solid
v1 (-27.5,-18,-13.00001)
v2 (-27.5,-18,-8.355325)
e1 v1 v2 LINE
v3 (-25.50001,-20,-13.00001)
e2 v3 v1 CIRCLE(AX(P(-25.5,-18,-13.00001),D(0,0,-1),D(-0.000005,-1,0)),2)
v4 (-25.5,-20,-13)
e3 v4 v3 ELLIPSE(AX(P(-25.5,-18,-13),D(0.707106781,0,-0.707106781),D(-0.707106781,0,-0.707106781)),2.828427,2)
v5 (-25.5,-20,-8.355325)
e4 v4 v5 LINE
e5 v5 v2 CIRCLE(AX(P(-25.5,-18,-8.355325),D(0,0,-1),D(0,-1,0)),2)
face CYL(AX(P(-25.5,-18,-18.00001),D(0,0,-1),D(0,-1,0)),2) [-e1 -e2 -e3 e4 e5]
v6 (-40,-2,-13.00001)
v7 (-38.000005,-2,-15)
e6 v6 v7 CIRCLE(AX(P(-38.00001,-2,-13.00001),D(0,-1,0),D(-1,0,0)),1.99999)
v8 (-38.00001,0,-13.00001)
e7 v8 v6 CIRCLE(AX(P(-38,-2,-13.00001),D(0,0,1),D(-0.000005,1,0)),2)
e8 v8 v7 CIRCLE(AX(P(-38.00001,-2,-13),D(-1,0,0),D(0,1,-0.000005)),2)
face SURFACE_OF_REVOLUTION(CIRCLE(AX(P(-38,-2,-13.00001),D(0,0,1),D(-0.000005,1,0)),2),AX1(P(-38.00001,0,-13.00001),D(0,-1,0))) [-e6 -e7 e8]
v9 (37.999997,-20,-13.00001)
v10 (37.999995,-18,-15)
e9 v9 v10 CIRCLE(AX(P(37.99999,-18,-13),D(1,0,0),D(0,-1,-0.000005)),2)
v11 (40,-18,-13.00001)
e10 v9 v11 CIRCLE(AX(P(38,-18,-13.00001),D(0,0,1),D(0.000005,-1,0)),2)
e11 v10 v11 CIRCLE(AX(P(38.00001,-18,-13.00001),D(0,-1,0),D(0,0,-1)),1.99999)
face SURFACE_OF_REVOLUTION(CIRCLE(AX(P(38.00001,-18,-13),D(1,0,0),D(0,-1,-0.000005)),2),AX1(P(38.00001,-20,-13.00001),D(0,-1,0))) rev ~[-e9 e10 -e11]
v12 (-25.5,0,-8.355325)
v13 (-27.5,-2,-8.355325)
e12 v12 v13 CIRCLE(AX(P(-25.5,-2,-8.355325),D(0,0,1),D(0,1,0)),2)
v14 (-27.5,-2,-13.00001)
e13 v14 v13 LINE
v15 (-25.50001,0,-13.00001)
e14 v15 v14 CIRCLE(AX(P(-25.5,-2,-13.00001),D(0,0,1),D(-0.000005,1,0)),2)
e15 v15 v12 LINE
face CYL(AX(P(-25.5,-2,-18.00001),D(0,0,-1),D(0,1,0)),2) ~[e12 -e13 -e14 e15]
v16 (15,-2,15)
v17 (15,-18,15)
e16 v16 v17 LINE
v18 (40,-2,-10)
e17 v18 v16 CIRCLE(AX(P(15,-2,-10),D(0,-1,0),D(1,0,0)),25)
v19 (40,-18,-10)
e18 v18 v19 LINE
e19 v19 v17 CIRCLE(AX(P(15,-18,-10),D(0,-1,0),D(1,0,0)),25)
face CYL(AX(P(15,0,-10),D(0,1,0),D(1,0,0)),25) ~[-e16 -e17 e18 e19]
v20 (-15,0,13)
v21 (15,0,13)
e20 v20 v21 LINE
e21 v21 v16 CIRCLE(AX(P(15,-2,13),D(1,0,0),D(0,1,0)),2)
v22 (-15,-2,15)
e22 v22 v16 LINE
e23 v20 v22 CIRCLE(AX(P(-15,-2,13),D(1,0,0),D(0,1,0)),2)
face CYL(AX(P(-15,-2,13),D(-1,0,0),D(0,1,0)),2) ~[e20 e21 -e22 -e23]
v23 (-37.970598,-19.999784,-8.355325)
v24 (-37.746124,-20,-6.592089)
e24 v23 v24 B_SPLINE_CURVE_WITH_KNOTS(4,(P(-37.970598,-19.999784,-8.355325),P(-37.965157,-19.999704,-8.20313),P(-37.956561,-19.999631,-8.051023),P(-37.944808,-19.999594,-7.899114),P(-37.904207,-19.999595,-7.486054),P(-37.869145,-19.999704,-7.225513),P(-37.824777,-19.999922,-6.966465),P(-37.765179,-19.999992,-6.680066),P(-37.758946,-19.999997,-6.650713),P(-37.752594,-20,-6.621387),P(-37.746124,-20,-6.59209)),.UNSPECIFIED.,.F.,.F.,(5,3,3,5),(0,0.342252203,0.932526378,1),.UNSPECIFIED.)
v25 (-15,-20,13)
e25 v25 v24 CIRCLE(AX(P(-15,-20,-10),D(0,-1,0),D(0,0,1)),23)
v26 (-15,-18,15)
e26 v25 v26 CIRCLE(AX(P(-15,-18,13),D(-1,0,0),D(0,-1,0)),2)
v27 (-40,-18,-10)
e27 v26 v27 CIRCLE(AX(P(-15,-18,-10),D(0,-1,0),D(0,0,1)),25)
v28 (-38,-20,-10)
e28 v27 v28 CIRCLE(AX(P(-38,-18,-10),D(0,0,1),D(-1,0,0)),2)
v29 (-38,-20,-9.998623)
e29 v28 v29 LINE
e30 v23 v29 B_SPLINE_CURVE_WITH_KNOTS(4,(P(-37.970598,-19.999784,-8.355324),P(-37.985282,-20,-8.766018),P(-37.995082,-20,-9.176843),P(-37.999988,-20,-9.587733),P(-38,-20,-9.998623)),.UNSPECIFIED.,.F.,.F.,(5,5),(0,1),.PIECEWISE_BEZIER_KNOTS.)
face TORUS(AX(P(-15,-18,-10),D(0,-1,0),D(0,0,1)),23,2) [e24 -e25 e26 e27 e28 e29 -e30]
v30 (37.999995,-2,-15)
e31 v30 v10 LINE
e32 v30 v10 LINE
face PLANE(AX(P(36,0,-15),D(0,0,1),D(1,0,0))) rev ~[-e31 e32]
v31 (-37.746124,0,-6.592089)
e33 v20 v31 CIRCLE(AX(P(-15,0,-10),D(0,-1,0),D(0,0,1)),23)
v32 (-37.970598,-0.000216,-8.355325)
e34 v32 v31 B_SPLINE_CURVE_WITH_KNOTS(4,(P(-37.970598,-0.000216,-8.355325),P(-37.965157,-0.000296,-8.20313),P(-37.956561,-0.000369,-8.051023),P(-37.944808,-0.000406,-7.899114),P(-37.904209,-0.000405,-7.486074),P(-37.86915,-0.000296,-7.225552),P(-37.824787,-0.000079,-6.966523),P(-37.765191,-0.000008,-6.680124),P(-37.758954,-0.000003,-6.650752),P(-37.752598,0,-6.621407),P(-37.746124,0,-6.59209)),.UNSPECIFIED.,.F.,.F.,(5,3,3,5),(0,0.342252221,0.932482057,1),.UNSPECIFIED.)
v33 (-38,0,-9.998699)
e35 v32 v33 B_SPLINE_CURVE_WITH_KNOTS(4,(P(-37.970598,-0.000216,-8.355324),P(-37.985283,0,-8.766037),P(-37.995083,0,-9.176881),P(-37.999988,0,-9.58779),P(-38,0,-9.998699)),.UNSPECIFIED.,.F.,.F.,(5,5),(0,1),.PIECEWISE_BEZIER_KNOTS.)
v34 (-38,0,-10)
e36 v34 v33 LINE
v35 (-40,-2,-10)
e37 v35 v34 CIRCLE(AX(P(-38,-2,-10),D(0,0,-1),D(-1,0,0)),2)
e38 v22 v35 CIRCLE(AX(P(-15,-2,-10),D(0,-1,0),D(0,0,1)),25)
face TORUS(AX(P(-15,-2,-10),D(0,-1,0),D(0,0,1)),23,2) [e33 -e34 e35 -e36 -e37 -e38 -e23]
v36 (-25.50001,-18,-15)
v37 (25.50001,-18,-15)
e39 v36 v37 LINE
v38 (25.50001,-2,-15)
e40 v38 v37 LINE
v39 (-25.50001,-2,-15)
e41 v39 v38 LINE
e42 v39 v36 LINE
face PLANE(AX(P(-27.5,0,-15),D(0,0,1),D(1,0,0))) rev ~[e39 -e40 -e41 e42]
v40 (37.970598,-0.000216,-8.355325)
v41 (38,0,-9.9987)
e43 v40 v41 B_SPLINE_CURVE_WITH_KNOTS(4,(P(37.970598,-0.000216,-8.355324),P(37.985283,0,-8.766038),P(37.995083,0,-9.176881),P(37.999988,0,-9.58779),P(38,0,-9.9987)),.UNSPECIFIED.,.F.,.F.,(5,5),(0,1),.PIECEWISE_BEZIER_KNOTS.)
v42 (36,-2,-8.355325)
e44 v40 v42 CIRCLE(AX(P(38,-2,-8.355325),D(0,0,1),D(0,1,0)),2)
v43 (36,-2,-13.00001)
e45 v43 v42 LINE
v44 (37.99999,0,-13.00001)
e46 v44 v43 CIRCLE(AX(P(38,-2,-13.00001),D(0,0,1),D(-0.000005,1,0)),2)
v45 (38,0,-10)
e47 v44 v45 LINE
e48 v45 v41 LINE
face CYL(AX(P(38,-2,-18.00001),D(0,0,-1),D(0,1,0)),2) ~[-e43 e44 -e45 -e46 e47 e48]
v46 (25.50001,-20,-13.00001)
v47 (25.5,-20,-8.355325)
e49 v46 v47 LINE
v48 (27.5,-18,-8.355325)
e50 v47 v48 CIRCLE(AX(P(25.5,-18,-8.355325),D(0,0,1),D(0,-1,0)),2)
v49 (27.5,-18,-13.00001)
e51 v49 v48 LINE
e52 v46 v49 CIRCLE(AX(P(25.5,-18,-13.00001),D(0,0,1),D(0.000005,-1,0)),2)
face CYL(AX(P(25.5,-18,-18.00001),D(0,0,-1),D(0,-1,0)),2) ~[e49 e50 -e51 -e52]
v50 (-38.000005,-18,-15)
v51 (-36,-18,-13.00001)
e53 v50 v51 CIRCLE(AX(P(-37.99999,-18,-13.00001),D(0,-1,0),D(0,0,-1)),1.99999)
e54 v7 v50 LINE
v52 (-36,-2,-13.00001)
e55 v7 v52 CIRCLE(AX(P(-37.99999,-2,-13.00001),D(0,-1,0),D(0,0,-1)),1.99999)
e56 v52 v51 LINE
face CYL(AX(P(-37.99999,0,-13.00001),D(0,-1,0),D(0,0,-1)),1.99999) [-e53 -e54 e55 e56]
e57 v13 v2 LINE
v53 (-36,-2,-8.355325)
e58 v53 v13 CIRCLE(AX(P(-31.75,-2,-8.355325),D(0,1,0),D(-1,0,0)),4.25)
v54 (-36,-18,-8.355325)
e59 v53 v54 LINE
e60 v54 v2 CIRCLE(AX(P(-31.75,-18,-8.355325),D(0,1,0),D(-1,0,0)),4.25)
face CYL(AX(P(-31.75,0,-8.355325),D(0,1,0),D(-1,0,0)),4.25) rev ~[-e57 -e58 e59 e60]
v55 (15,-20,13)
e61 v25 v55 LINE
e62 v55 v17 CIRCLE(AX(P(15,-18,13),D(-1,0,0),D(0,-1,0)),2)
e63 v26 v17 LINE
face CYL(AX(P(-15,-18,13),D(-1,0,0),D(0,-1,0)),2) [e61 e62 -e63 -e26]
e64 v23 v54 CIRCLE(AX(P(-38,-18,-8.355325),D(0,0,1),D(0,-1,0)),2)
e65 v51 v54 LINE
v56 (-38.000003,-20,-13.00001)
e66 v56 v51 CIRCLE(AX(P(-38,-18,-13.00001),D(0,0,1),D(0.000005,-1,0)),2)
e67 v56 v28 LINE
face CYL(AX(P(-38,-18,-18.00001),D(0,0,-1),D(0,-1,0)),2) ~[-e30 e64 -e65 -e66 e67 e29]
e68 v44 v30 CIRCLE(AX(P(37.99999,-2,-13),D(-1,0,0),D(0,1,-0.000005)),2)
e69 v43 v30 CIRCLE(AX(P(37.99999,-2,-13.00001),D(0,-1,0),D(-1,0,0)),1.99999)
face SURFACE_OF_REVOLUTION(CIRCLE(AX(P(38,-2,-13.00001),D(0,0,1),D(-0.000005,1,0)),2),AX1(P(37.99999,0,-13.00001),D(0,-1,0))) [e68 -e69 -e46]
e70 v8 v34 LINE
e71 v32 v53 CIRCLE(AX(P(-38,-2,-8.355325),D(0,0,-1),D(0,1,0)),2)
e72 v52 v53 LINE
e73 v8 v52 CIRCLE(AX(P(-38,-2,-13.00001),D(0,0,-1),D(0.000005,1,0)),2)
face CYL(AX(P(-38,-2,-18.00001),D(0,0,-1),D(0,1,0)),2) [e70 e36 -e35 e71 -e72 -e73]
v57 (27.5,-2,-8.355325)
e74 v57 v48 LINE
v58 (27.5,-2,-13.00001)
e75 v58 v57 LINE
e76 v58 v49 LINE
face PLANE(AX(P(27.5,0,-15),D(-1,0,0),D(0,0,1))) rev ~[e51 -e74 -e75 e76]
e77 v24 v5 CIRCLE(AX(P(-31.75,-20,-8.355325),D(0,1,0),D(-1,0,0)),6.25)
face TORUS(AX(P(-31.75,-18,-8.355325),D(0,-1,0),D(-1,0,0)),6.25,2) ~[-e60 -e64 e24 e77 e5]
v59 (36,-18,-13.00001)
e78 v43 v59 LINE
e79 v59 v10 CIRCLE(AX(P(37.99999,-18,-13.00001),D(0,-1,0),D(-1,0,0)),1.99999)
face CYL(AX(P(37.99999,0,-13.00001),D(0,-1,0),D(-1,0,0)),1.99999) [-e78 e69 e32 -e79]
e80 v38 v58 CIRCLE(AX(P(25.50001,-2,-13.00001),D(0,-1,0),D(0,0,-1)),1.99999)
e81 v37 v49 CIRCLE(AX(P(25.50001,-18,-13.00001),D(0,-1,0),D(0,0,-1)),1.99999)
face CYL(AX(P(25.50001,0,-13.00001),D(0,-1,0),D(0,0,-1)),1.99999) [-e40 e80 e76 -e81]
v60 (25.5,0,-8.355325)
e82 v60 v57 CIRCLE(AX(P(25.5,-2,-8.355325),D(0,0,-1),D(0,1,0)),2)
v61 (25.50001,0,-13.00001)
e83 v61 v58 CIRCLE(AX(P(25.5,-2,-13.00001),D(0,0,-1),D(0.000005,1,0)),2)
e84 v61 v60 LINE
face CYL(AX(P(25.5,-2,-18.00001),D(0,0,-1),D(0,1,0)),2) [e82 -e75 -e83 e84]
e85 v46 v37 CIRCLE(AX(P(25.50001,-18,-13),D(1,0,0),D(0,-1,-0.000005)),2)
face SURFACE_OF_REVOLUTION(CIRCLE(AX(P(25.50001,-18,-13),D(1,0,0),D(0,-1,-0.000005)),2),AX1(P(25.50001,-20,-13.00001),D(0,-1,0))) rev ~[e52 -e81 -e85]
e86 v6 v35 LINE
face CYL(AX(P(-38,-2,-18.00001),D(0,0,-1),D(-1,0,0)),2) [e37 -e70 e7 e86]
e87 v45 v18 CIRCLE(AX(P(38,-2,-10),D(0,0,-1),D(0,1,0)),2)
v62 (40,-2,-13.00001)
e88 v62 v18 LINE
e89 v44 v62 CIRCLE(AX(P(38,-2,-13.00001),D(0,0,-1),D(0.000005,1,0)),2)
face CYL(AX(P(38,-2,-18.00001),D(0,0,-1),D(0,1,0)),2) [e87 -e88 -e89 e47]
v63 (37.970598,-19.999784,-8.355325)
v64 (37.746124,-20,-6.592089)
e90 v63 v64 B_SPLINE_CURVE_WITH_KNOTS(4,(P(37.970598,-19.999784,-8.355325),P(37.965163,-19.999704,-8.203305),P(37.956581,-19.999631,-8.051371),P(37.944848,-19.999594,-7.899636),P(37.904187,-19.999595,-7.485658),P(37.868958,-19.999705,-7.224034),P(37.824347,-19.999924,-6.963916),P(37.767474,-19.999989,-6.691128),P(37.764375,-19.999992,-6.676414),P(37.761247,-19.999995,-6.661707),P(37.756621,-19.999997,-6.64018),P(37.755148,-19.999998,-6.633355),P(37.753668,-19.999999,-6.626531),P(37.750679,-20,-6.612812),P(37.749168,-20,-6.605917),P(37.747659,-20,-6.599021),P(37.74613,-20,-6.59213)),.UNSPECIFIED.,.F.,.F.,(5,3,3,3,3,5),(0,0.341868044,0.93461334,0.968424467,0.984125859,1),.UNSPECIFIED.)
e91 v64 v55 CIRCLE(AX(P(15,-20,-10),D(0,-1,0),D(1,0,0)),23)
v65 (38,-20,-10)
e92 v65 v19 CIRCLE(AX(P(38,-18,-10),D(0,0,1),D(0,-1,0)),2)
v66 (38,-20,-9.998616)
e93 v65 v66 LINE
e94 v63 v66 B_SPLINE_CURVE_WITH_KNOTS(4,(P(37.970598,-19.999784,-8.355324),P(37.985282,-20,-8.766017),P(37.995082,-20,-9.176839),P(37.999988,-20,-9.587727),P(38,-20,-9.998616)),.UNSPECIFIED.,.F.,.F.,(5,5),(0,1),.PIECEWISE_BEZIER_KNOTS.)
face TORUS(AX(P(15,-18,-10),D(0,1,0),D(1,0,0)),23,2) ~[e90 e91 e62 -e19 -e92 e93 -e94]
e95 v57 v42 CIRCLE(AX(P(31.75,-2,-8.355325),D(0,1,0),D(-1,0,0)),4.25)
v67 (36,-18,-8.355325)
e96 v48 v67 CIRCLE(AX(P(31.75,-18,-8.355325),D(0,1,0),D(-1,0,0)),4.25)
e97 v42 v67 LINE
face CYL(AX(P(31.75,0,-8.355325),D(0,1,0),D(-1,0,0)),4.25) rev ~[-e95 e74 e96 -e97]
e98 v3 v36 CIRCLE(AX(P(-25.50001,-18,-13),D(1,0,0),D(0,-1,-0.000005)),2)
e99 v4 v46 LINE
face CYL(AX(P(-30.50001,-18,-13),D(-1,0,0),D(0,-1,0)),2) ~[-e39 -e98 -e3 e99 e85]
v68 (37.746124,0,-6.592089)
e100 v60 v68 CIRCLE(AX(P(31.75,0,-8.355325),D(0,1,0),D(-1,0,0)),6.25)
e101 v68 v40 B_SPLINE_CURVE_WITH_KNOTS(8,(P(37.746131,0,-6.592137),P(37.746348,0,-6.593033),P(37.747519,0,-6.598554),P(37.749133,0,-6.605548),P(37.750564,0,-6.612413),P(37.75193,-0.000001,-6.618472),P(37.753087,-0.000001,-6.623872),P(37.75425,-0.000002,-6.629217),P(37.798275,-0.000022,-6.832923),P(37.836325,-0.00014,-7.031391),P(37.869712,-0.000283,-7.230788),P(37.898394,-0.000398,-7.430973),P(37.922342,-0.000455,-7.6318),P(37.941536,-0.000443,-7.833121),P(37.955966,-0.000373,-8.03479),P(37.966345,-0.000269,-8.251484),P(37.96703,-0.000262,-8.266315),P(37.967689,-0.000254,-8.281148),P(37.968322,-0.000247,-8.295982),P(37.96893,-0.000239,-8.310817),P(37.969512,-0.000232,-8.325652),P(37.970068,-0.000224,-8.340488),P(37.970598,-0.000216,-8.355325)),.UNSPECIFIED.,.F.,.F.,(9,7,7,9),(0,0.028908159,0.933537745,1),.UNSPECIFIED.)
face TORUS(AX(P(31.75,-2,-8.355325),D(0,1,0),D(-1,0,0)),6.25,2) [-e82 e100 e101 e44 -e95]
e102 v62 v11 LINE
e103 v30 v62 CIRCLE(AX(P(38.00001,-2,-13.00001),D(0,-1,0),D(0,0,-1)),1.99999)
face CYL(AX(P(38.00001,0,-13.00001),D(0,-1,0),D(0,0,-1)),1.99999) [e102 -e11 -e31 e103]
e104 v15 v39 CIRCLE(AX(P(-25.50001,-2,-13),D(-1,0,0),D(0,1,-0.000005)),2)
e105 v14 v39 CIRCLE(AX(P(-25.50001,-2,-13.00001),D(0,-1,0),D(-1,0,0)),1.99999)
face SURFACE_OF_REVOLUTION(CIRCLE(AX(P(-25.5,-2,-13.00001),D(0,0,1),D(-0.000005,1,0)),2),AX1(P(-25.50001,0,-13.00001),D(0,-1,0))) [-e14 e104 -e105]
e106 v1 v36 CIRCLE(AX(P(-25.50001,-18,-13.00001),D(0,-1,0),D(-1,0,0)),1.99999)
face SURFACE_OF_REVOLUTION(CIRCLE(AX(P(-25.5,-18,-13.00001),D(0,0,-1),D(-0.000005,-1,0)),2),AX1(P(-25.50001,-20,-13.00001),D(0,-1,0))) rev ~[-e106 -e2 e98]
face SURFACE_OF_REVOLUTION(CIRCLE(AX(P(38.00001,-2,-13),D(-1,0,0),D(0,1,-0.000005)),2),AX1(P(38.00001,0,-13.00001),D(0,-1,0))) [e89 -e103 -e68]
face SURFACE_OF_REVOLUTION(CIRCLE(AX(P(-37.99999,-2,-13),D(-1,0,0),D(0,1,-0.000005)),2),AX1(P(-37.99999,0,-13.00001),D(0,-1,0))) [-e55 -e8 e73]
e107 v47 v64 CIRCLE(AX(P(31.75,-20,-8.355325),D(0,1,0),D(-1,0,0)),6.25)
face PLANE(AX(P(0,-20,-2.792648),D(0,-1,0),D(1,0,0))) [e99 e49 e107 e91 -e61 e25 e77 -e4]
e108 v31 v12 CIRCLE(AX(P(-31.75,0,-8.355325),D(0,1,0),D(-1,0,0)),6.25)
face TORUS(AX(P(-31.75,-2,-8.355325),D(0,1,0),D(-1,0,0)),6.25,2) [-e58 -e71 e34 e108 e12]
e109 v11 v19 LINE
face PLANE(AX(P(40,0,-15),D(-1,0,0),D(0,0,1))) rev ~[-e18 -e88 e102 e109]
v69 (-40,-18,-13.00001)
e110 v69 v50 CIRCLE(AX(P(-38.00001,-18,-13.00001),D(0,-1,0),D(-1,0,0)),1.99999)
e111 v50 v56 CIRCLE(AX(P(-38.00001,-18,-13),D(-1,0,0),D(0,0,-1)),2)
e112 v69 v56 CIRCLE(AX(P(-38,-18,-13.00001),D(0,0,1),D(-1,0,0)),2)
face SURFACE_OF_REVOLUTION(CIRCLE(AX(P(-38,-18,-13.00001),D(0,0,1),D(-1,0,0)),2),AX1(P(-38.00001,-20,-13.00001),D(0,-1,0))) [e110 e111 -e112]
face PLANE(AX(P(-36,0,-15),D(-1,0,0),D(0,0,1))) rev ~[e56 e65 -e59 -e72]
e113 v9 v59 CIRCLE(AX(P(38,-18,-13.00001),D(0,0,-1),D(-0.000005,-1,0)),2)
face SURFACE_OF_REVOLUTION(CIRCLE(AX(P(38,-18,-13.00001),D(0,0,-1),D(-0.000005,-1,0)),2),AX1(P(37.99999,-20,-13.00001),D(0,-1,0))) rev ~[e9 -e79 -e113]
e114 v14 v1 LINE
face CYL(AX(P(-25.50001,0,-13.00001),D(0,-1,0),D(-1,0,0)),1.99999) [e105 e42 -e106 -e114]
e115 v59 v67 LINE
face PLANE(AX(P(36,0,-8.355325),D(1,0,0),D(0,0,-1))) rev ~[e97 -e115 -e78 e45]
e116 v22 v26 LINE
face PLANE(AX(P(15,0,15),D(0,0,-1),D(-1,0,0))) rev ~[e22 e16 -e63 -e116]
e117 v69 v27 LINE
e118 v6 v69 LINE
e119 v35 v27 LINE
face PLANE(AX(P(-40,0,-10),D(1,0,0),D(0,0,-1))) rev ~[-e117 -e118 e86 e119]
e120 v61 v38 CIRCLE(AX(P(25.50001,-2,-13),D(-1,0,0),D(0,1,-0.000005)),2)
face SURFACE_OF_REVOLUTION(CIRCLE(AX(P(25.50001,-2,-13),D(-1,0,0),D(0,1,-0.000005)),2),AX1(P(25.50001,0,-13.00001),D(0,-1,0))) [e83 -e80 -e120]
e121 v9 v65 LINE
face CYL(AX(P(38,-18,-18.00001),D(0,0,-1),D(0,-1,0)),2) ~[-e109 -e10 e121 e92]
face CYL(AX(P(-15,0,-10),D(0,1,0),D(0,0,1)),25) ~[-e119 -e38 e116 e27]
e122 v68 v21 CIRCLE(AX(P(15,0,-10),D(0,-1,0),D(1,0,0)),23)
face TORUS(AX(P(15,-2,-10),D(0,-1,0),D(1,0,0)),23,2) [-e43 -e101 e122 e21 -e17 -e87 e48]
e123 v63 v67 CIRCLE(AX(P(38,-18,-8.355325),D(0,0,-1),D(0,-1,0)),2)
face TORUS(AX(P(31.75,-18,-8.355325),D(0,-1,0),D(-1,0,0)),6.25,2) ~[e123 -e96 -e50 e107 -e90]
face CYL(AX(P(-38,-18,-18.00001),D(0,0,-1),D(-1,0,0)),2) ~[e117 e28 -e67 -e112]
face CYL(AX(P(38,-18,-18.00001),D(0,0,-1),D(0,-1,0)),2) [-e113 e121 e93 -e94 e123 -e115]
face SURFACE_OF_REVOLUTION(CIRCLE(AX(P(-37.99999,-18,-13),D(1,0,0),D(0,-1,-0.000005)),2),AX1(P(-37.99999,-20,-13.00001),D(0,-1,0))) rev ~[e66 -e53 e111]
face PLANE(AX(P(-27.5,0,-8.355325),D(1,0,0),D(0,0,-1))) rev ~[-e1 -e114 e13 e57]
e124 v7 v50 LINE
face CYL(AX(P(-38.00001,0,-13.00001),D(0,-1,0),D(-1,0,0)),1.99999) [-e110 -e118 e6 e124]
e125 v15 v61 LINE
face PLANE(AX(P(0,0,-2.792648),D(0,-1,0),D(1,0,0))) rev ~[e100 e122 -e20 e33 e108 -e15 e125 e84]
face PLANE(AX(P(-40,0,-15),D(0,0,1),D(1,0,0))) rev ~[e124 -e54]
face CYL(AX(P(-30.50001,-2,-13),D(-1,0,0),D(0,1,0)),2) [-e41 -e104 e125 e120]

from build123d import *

# Parameters (mm, degrees)
F1_DEPTH     = 20
F2_R         = 1.99999
F3_T1_DEPTH  = 30
F3_T3_DEPTH  = 8.00001
F3_T5_DEPTH  = 10.00002
F3_T7_DEPTH  = 9.6446849121
F3_T9_DEPTH  = 61.00002
F3_T11_DEPTH = 10.00002
F3_T14_ANGLE = 90
F3_T16_ANGLE = 90
F3_T18_ANGLE = 90
F3_T20_ANGLE = 90
F3_T22_ANGLE = 180
F3_T24_ANGLE = 90
F3_T26_ANGLE = 90
F3_T28_ANGLE = 180
F3_T30_ANGLE = 90
F3_T32_ANGLE = 90
F3_T34_ANGLE = 90
F3_T36_ANGLE = 90
F3_T38_ANGLE = 90
F3_T40_ANGLE = 90
F3_T42_ANGLE = 180
F3_T44_ANGLE = 90
F3_T46_ANGLE = 90
F3_T48_ANGLE = 180
F3_T50_ANGLE = 90
F3_T52_ANGLE = 90


# Not quite as in the source:
# - a fillet or chamfer that OpenCascade refuses, or shapes differently, is made with other operations: its cross-section is extruded or revolved along the edge and cut away or added
# - a fillet or chamfer is up to 0.001 mm smaller than in the source, because OpenCascade refuses the exact size


with BuildPart() as f1:
    # F0 (on Front) → F1 (new body)
    with BuildSketch(Plane.XZ):
        with BuildLine():
            Line((15, 15), (-15, 15))
            ThreePointArc((-15, 15), (-32.6776695297, 7.6776695297), (-40, -10))
            Line((-40, -10), (-40, -15))
            Line((-40, -15), (-36, -15))
            Line((-36, -15), (-36, -8.3553250879))
            ThreePointArc((-36, -8.3553250879), (-31.75, -4.1053250879), (-27.5, -8.3553250879))
            Line((-27.5, -8.3553250879), (-27.5, -15))
            Line((-27.5, -15), (27.5, -15))
            Line((27.5, -15), (27.5, -8.3553250879))
            ThreePointArc((27.5, -8.3553250879), (31.75, -4.1053250879), (36, -8.3553250879))
            Line((36, -8.3553250879), (36, -15))
            Line((36, -15), (40, -15))
            Line((40, -15), (40, -10))
            ThreePointArc((40, -10), (32.6776695297, 7.6776695297), (15, 15))
        make_face()
    extrude(amount=F1_DEPTH)

    # F2 (radius 2 in the source; OpenCascade refuses exactly that, so slightly less here)
    f2_edges = [f1.edges().sort_by_distance(p)[0] for p in [
        (36, -10, -15),
        (27.5, -10, -15),
        (40, -10, -15),
        (-27.5, -10, -15),
        (-36, -10, -15),
        (-40, -10, -15),
    ]]
    fillet(f2_edges, radius=F2_R)

    # F3: fillet of radius 2 on 2 edges, made by hand

    # F3_s2 → F3_t1 (cut)
    with BuildSketch(Plane.YZ.offset(-15)):
        with BuildLine():
            ThreePointArc((0, 13), (-0.5857864376, 14.4142135624), (-2, 15))
            Line((-2, 15), (0, 15))
            Line((0, 15), (0, 13))
        make_face()
        with BuildLine():
            ThreePointArc((-20, 13), (-19.4142135624, 14.4142135624), (-18, 15))
            Line((-18, 15), (-20, 15))
            Line((-20, 15), (-20, 13))
        make_face()
    extrude(amount=F3_T1_DEPTH, mode=Mode.SUBTRACT)

    # F3_s4 → F3_t3 (cut)
    with BuildSketch(Plane.XY.offset(-18.00001)):
        with BuildLine():
            ThreePointArc((38, -20), (39.4142135624, -19.4142135624), (40, -18))
            Line((40, -18), (40, -20))
            Line((40, -20), (38, -20))
        make_face()
        with BuildLine():
            ThreePointArc((-40, -18), (-39.4142135624, -19.4142135624), (-38, -20))
            Line((-38, -20), (-40, -20))
            Line((-40, -20), (-40, -18))
        make_face()
        with BuildLine():
            ThreePointArc((-40, -2), (-39.4142135624, -0.5857864376), (-38, 0))
            Line((-38, 0), (-40, 0))
            Line((-40, 0), (-40, -2))
        make_face()
        with BuildLine():
            ThreePointArc((38, 0), (39.4142135624, -0.5857864376), (40, -2))
            Line((40, -2), (40, 0))
            Line((40, 0), (38, 0))
        make_face()
    extrude(amount=F3_T3_DEPTH, mode=Mode.SUBTRACT)

    # F3_s6 → F3_t5 (cut)
    with BuildSketch(Plane.YZ.offset(-43.00001)):
        with BuildLine():
            ThreePointArc((-20, -13), (-19.4142135624, -14.4142135624), (-18, -15))
            Line((-18, -15), (-20, -15))
            Line((-20, -15), (-20, -13))
        make_face()
        with BuildLine():
            ThreePointArc((0, -13), (-0.5857864376, -14.4142135624), (-2, -15))
            Line((-2, -15), (0, -15))
            Line((0, -15), (0, -13))
        make_face()
    extrude(amount=F3_T5_DEPTH, mode=Mode.SUBTRACT)

    # F3_s8 → F3_t7 (cut)
    with BuildSketch(Plane.XY.offset(-18.00001)):
        with BuildLine():
            ThreePointArc((-38, -20), (-36.5857864376, -19.4142135624), (-36, -18))
            Line((-36, -18), (-36, -20))
            Line((-36, -20), (-38, -20))
        make_face()
        with BuildLine():
            ThreePointArc((-25.5, -20), (-26.9142135624, -19.4142135624), (-27.5, -18))
            Line((-27.5, -18), (-27.5, -20))
            Line((-27.5, -20), (-25.5, -20))
        make_face()
        with BuildLine():
            ThreePointArc((25.5, -20), (26.9142135624, -19.4142135624), (27.5, -18))
            Line((27.5, -18), (27.5, -20))
            Line((27.5, -20), (25.5, -20))
        make_face()
        with BuildLine():
            ThreePointArc((38, -20), (36.5857864376, -19.4142135624), (36, -18))
            Line((36, -18), (36, -20))
            Line((36, -20), (38, -20))
        make_face()
        with BuildLine():
            ThreePointArc((-38, 0), (-36.5857864376, -0.5857864376), (-36, -2))
            Line((-36, -2), (-36, 0))
            Line((-36, 0), (-38, 0))
        make_face()
        with BuildLine():
            ThreePointArc((-25.5, 0), (-26.9142135624, -0.5857864376), (-27.5, -2))
            Line((-27.5, -2), (-27.5, 0))
            Line((-27.5, 0), (-25.5, 0))
        make_face()
        with BuildLine():
            ThreePointArc((25.5, 0), (26.9142135624, -0.5857864376), (27.5, -2))
            Line((27.5, -2), (27.5, 0))
            Line((27.5, 0), (25.5, 0))
        make_face()
        with BuildLine():
            ThreePointArc((38, 0), (36.5857864376, -0.5857864376), (36, -2))
            Line((36, -2), (36, 0))
            Line((36, 0), (38, 0))
        make_face()
    extrude(amount=F3_T7_DEPTH, mode=Mode.SUBTRACT)

    # F3_s10 → F3_t9 (cut)
    with BuildSketch(Plane.YZ.offset(-30.50001)):
        with BuildLine():
            ThreePointArc((-20, -13), (-19.4142135624, -14.4142135624), (-18, -15))
            Line((-18, -15), (-20, -15))
            Line((-20, -15), (-20, -13))
        make_face()
        with BuildLine():
            ThreePointArc((0, -13), (-0.5857864376, -14.4142135624), (-2, -15))
            Line((-2, -15), (0, -15))
            Line((0, -15), (0, -13))
        make_face()
    extrude(amount=F3_T9_DEPTH, mode=Mode.SUBTRACT)

    # F3_s12 → F3_t11 (cut)
    with BuildSketch(Plane.YZ.offset(32.99999)):
        with BuildLine():
            ThreePointArc((-20, -13), (-19.4142135624, -14.4142135624), (-18, -15))
            Line((-18, -15), (-20, -15))
            Line((-20, -15), (-20, -13))
        make_face()
        with BuildLine():
            ThreePointArc((0, -13), (-0.5857864376, -14.4142135624), (-2, -15))
            Line((-2, -15), (0, -15))
            Line((0, -15), (0, -13))
        make_face()
    extrude(amount=F3_T11_DEPTH, mode=Mode.SUBTRACT)

    # F3_s13 → F3_t14 (revolve, cut)
    with BuildSketch(Plane.XY.offset(-10)):
        with BuildLine():
            ThreePointArc((38, -20), (39.4142135624, -19.4142135624), (40, -18))
            Line((40, -18), (40, -20))
            Line((40, -20), (38, -20))
        make_face()
    revolve(axis=Axis((15, -20, -10), (0, -1, 0)), revolution_arc=F3_T14_ANGLE, mode=Mode.SUBTRACT)

    # F3_s15 → F3_t16 (revolve, cut)
    with BuildSketch(Plane.YZ.offset(-15)):
        with BuildLine():
            ThreePointArc((-18, 15), (-19.4142135624, 14.4142135624), (-20, 13))
            Line((-20, 13), (-20, 15))
            Line((-20, 15), (-18, 15))
        make_face()
    revolve(axis=Axis((-15, -20, -10), (0, -1, 0)), revolution_arc=F3_T16_ANGLE, mode=Mode.SUBTRACT)

    # F3_s17 → F3_t18 (revolve, cut)
    with BuildSketch(Plane.XY.offset(-13.00001)):
        with BuildLine():
            ThreePointArc((-40, -18), (-39.4142170979, -19.4142100268), (-38.00001, -20))
            Line((-38.00001, -20), (-40, -20))
            Line((-40, -20), (-40, -18))
        make_face()
    revolve(axis=Axis((-38.00001, -20, -13.00001), (0, -1, 0)), revolution_arc=F3_T18_ANGLE, mode=Mode.SUBTRACT)

    # F3_s19 → F3_t20 (revolve, cut)
    with BuildSketch(Plane.YZ.offset(-37.99999)):
        with BuildLine():
            ThreePointArc((-20, -13.00001), (-19.4142100268, -14.4142170979), (-18, -15))
            Line((-18, -15), (-20, -15))
            Line((-20, -15), (-20, -13.00001))
        make_face()
    revolve(axis=Axis((-37.99999, -20, -13.00001), (0, -1, 0)), revolution_arc=F3_T20_ANGLE, mode=Mode.SUBTRACT)

    # F3_s21 → F3_t22 (revolve, cut)
    with BuildSketch(Plane.XY.offset(-8.3553250879)):
        with BuildLine():
            ThreePointArc((-38, -20), (-36.5857864376, -19.4142135624), (-36, -18))
            Line((-36, -18), (-36, -20))
            Line((-36, -20), (-38, -20))
        make_face()
    revolve(axis=Axis((-31.75, -20, -8.3553250879), (0, 1, 0)), revolution_arc=F3_T22_ANGLE, mode=Mode.SUBTRACT)

    # F3_s23 → F3_t24 (revolve, cut)
    with BuildSketch(Plane.XY.offset(-13.00001)):
        with BuildLine():
            ThreePointArc((-25.50001, -20), (-26.9142170979, -19.4142100268), (-27.5, -18))
            Line((-27.5, -18), (-27.5, -20))
            Line((-27.5, -20), (-25.50001, -20))
        make_face()
    revolve(axis=Axis((-25.50001, -20, -13.00001), (0, -1, 0)), revolution_arc=F3_T24_ANGLE, mode=Mode.SUBTRACT)

    # F3_s25 → F3_t26 (revolve, cut)
    with BuildSketch(Plane.YZ.offset(25.50001)):
        with BuildLine():
            ThreePointArc((-20, -13.00001), (-19.4142100268, -14.4142170979), (-18, -15))
            Line((-18, -15), (-20, -15))
            Line((-20, -15), (-20, -13.00001))
        make_face()
    revolve(axis=Axis((25.50001, -20, -13.00001), (0, -1, 0)), revolution_arc=F3_T26_ANGLE, mode=Mode.SUBTRACT)

    # F3_s27 → F3_t28 (revolve, cut)
    with BuildSketch(Plane.XY.offset(-8.3553250879)):
        with BuildLine():
            ThreePointArc((25.5, -20), (26.9142135624, -19.4142135624), (27.5, -18))
            Line((27.5, -18), (27.5, -20))
            Line((27.5, -20), (25.5, -20))
        make_face()
    revolve(axis=Axis((31.75, -20, -8.3553250879), (0, 1, 0)), revolution_arc=F3_T28_ANGLE, mode=Mode.SUBTRACT)

    # F3_s29 → F3_t30 (revolve, cut)
    with BuildSketch(Plane.XY.offset(-13.00001)):
        with BuildLine():
            ThreePointArc((37.99999, -20), (36.5857829021, -19.4142100268), (36, -18))
            Line((36, -18), (36, -20))
            Line((36, -20), (37.99999, -20))
        make_face()
    revolve(axis=Axis((37.99999, -20, -13.00001), (0, -1, 0)), revolution_arc=F3_T30_ANGLE, mode=Mode.SUBTRACT)

    # F3_s31 → F3_t32 (revolve, cut)
    with BuildSketch(Plane.YZ.offset(38.00001)):
        with BuildLine():
            ThreePointArc((-20, -13.00001), (-19.4142100268, -14.4142170979), (-18, -15))
            Line((-18, -15), (-20, -15))
            Line((-20, -15), (-20, -13.00001))
        make_face()
    revolve(axis=Axis((38.00001, -20, -13.00001), (0, -1, 0)), revolution_arc=F3_T32_ANGLE, mode=Mode.SUBTRACT)

    # F3_s33 → F3_t34 (revolve, cut)
    with BuildSketch(Plane.XY.offset(-10)):
        with BuildLine():
            ThreePointArc((38, 0), (39.4142135624, -0.5857864376), (40, -2))
            Line((40, -2), (40, 0))
            Line((40, 0), (38, 0))
        make_face()
    revolve(axis=Axis((15, 0, -10), (0, -1, 0)), revolution_arc=F3_T34_ANGLE, mode=Mode.SUBTRACT)

    # F3_s35 → F3_t36 (revolve, cut)
    with BuildSketch(Plane.YZ.offset(-15)):
        with BuildLine():
            ThreePointArc((0, 13), (-0.5857864376, 14.4142135624), (-2, 15))
            Line((-2, 15), (0, 15))
            Line((0, 15), (0, 13))
        make_face()
    revolve(axis=Axis((-15, 0, -10), (0, -1, 0)), revolution_arc=F3_T36_ANGLE, mode=Mode.SUBTRACT)

    # F3_s37 → F3_t38 (revolve, cut)
    with BuildSketch(Plane.XY.offset(-13.00001)):
        with BuildLine():
            ThreePointArc((-38.00001, 0), (-39.4142170979, -0.5857899732), (-40, -2))
            Line((-40, -2), (-40, 0))
            Line((-40, 0), (-38.00001, 0))
        make_face()
    revolve(axis=Axis((-38.00001, 0, -13.00001), (0, -1, 0)), revolution_arc=F3_T38_ANGLE, mode=Mode.SUBTRACT)

    # F3_s39 → F3_t40 (revolve, cut)
    with BuildSketch(Plane.YZ.offset(-37.99999)):
        with BuildLine():
            ThreePointArc((0, -13.00001), (-0.5857899732, -14.4142170979), (-2, -15))
            Line((-2, -15), (0, -15))
            Line((0, -15), (0, -13.00001))
        make_face()
    revolve(axis=Axis((-37.99999, 0, -13.00001), (0, -1, 0)), revolution_arc=F3_T40_ANGLE, mode=Mode.SUBTRACT)

    # F3_s41 → F3_t42 (revolve, cut)
    with BuildSketch(Plane.XY.offset(-8.3553250879)):
        with BuildLine():
            ThreePointArc((-38, 0), (-36.5857864376, -0.5857864376), (-36, -2))
            Line((-36, -2), (-36, 0))
            Line((-36, 0), (-38, 0))
        make_face()
    revolve(axis=Axis((-31.75, 0, -8.3553250879), (0, 1, 0)), revolution_arc=F3_T42_ANGLE, mode=Mode.SUBTRACT)

    # F3_s43 → F3_t44 (revolve, cut)
    with BuildSketch(Plane.XY.offset(-13.00001)):
        with BuildLine():
            ThreePointArc((-25.50001, 0), (-26.9142170979, -0.5857899732), (-27.5, -2))
            Line((-27.5, -2), (-27.5, 0))
            Line((-27.5, 0), (-25.50001, 0))
        make_face()
    revolve(axis=Axis((-25.50001, 0, -13.00001), (0, -1, 0)), revolution_arc=F3_T44_ANGLE, mode=Mode.SUBTRACT)

    # F3_s45 → F3_t46 (revolve, cut)
    with BuildSketch(Plane.YZ.offset(25.50001)):
        with BuildLine():
            ThreePointArc((0, -13.00001), (-0.5857899732, -14.4142170979), (-2, -15))
            Line((-2, -15), (0, -15))
            Line((0, -15), (0, -13.00001))
        make_face()
    revolve(axis=Axis((25.50001, 0, -13.00001), (0, -1, 0)), revolution_arc=F3_T46_ANGLE, mode=Mode.SUBTRACT)

    # F3_s47 → F3_t48 (revolve, cut)
    with BuildSketch(Plane.XY.offset(-8.3553250879)):
        with BuildLine():
            ThreePointArc((25.5, 0), (26.9142135624, -0.5857864376), (27.5, -2))
            Line((27.5, -2), (27.5, 0))
            Line((27.5, 0), (25.5, 0))
        make_face()
    revolve(axis=Axis((31.75, 0, -8.3553250879), (0, 1, 0)), revolution_arc=F3_T48_ANGLE, mode=Mode.SUBTRACT)

    # F3_s49 → F3_t50 (revolve, cut)
    with BuildSketch(Plane.XY.offset(-13.00001)):
        with BuildLine():
            ThreePointArc((37.99999, 0), (36.5857829021, -0.5857899732), (36, -2))
            Line((36, -2), (36, 0))
            Line((36, 0), (37.99999, 0))
        make_face()
    revolve(axis=Axis((37.99999, 0, -13.00001), (0, -1, 0)), revolution_arc=F3_T50_ANGLE, mode=Mode.SUBTRACT)

    # F3_s51 → F3_t52 (revolve, cut)
    with BuildSketch(Plane.YZ.offset(38.00001)):
        with BuildLine():
            ThreePointArc((0, -13.00001), (-0.5857899732, -14.4142170979), (-2, -15))
            Line((-2, -15), (0, -15))
            Line((0, -15), (0, -13.00001))
        make_face()
    revolve(axis=Axis((38.00001, 0, -13.00001), (0, -1, 0)), revolution_arc=F3_T52_ANGLE, mode=Mode.SUBTRACT)


solid = f1.part
